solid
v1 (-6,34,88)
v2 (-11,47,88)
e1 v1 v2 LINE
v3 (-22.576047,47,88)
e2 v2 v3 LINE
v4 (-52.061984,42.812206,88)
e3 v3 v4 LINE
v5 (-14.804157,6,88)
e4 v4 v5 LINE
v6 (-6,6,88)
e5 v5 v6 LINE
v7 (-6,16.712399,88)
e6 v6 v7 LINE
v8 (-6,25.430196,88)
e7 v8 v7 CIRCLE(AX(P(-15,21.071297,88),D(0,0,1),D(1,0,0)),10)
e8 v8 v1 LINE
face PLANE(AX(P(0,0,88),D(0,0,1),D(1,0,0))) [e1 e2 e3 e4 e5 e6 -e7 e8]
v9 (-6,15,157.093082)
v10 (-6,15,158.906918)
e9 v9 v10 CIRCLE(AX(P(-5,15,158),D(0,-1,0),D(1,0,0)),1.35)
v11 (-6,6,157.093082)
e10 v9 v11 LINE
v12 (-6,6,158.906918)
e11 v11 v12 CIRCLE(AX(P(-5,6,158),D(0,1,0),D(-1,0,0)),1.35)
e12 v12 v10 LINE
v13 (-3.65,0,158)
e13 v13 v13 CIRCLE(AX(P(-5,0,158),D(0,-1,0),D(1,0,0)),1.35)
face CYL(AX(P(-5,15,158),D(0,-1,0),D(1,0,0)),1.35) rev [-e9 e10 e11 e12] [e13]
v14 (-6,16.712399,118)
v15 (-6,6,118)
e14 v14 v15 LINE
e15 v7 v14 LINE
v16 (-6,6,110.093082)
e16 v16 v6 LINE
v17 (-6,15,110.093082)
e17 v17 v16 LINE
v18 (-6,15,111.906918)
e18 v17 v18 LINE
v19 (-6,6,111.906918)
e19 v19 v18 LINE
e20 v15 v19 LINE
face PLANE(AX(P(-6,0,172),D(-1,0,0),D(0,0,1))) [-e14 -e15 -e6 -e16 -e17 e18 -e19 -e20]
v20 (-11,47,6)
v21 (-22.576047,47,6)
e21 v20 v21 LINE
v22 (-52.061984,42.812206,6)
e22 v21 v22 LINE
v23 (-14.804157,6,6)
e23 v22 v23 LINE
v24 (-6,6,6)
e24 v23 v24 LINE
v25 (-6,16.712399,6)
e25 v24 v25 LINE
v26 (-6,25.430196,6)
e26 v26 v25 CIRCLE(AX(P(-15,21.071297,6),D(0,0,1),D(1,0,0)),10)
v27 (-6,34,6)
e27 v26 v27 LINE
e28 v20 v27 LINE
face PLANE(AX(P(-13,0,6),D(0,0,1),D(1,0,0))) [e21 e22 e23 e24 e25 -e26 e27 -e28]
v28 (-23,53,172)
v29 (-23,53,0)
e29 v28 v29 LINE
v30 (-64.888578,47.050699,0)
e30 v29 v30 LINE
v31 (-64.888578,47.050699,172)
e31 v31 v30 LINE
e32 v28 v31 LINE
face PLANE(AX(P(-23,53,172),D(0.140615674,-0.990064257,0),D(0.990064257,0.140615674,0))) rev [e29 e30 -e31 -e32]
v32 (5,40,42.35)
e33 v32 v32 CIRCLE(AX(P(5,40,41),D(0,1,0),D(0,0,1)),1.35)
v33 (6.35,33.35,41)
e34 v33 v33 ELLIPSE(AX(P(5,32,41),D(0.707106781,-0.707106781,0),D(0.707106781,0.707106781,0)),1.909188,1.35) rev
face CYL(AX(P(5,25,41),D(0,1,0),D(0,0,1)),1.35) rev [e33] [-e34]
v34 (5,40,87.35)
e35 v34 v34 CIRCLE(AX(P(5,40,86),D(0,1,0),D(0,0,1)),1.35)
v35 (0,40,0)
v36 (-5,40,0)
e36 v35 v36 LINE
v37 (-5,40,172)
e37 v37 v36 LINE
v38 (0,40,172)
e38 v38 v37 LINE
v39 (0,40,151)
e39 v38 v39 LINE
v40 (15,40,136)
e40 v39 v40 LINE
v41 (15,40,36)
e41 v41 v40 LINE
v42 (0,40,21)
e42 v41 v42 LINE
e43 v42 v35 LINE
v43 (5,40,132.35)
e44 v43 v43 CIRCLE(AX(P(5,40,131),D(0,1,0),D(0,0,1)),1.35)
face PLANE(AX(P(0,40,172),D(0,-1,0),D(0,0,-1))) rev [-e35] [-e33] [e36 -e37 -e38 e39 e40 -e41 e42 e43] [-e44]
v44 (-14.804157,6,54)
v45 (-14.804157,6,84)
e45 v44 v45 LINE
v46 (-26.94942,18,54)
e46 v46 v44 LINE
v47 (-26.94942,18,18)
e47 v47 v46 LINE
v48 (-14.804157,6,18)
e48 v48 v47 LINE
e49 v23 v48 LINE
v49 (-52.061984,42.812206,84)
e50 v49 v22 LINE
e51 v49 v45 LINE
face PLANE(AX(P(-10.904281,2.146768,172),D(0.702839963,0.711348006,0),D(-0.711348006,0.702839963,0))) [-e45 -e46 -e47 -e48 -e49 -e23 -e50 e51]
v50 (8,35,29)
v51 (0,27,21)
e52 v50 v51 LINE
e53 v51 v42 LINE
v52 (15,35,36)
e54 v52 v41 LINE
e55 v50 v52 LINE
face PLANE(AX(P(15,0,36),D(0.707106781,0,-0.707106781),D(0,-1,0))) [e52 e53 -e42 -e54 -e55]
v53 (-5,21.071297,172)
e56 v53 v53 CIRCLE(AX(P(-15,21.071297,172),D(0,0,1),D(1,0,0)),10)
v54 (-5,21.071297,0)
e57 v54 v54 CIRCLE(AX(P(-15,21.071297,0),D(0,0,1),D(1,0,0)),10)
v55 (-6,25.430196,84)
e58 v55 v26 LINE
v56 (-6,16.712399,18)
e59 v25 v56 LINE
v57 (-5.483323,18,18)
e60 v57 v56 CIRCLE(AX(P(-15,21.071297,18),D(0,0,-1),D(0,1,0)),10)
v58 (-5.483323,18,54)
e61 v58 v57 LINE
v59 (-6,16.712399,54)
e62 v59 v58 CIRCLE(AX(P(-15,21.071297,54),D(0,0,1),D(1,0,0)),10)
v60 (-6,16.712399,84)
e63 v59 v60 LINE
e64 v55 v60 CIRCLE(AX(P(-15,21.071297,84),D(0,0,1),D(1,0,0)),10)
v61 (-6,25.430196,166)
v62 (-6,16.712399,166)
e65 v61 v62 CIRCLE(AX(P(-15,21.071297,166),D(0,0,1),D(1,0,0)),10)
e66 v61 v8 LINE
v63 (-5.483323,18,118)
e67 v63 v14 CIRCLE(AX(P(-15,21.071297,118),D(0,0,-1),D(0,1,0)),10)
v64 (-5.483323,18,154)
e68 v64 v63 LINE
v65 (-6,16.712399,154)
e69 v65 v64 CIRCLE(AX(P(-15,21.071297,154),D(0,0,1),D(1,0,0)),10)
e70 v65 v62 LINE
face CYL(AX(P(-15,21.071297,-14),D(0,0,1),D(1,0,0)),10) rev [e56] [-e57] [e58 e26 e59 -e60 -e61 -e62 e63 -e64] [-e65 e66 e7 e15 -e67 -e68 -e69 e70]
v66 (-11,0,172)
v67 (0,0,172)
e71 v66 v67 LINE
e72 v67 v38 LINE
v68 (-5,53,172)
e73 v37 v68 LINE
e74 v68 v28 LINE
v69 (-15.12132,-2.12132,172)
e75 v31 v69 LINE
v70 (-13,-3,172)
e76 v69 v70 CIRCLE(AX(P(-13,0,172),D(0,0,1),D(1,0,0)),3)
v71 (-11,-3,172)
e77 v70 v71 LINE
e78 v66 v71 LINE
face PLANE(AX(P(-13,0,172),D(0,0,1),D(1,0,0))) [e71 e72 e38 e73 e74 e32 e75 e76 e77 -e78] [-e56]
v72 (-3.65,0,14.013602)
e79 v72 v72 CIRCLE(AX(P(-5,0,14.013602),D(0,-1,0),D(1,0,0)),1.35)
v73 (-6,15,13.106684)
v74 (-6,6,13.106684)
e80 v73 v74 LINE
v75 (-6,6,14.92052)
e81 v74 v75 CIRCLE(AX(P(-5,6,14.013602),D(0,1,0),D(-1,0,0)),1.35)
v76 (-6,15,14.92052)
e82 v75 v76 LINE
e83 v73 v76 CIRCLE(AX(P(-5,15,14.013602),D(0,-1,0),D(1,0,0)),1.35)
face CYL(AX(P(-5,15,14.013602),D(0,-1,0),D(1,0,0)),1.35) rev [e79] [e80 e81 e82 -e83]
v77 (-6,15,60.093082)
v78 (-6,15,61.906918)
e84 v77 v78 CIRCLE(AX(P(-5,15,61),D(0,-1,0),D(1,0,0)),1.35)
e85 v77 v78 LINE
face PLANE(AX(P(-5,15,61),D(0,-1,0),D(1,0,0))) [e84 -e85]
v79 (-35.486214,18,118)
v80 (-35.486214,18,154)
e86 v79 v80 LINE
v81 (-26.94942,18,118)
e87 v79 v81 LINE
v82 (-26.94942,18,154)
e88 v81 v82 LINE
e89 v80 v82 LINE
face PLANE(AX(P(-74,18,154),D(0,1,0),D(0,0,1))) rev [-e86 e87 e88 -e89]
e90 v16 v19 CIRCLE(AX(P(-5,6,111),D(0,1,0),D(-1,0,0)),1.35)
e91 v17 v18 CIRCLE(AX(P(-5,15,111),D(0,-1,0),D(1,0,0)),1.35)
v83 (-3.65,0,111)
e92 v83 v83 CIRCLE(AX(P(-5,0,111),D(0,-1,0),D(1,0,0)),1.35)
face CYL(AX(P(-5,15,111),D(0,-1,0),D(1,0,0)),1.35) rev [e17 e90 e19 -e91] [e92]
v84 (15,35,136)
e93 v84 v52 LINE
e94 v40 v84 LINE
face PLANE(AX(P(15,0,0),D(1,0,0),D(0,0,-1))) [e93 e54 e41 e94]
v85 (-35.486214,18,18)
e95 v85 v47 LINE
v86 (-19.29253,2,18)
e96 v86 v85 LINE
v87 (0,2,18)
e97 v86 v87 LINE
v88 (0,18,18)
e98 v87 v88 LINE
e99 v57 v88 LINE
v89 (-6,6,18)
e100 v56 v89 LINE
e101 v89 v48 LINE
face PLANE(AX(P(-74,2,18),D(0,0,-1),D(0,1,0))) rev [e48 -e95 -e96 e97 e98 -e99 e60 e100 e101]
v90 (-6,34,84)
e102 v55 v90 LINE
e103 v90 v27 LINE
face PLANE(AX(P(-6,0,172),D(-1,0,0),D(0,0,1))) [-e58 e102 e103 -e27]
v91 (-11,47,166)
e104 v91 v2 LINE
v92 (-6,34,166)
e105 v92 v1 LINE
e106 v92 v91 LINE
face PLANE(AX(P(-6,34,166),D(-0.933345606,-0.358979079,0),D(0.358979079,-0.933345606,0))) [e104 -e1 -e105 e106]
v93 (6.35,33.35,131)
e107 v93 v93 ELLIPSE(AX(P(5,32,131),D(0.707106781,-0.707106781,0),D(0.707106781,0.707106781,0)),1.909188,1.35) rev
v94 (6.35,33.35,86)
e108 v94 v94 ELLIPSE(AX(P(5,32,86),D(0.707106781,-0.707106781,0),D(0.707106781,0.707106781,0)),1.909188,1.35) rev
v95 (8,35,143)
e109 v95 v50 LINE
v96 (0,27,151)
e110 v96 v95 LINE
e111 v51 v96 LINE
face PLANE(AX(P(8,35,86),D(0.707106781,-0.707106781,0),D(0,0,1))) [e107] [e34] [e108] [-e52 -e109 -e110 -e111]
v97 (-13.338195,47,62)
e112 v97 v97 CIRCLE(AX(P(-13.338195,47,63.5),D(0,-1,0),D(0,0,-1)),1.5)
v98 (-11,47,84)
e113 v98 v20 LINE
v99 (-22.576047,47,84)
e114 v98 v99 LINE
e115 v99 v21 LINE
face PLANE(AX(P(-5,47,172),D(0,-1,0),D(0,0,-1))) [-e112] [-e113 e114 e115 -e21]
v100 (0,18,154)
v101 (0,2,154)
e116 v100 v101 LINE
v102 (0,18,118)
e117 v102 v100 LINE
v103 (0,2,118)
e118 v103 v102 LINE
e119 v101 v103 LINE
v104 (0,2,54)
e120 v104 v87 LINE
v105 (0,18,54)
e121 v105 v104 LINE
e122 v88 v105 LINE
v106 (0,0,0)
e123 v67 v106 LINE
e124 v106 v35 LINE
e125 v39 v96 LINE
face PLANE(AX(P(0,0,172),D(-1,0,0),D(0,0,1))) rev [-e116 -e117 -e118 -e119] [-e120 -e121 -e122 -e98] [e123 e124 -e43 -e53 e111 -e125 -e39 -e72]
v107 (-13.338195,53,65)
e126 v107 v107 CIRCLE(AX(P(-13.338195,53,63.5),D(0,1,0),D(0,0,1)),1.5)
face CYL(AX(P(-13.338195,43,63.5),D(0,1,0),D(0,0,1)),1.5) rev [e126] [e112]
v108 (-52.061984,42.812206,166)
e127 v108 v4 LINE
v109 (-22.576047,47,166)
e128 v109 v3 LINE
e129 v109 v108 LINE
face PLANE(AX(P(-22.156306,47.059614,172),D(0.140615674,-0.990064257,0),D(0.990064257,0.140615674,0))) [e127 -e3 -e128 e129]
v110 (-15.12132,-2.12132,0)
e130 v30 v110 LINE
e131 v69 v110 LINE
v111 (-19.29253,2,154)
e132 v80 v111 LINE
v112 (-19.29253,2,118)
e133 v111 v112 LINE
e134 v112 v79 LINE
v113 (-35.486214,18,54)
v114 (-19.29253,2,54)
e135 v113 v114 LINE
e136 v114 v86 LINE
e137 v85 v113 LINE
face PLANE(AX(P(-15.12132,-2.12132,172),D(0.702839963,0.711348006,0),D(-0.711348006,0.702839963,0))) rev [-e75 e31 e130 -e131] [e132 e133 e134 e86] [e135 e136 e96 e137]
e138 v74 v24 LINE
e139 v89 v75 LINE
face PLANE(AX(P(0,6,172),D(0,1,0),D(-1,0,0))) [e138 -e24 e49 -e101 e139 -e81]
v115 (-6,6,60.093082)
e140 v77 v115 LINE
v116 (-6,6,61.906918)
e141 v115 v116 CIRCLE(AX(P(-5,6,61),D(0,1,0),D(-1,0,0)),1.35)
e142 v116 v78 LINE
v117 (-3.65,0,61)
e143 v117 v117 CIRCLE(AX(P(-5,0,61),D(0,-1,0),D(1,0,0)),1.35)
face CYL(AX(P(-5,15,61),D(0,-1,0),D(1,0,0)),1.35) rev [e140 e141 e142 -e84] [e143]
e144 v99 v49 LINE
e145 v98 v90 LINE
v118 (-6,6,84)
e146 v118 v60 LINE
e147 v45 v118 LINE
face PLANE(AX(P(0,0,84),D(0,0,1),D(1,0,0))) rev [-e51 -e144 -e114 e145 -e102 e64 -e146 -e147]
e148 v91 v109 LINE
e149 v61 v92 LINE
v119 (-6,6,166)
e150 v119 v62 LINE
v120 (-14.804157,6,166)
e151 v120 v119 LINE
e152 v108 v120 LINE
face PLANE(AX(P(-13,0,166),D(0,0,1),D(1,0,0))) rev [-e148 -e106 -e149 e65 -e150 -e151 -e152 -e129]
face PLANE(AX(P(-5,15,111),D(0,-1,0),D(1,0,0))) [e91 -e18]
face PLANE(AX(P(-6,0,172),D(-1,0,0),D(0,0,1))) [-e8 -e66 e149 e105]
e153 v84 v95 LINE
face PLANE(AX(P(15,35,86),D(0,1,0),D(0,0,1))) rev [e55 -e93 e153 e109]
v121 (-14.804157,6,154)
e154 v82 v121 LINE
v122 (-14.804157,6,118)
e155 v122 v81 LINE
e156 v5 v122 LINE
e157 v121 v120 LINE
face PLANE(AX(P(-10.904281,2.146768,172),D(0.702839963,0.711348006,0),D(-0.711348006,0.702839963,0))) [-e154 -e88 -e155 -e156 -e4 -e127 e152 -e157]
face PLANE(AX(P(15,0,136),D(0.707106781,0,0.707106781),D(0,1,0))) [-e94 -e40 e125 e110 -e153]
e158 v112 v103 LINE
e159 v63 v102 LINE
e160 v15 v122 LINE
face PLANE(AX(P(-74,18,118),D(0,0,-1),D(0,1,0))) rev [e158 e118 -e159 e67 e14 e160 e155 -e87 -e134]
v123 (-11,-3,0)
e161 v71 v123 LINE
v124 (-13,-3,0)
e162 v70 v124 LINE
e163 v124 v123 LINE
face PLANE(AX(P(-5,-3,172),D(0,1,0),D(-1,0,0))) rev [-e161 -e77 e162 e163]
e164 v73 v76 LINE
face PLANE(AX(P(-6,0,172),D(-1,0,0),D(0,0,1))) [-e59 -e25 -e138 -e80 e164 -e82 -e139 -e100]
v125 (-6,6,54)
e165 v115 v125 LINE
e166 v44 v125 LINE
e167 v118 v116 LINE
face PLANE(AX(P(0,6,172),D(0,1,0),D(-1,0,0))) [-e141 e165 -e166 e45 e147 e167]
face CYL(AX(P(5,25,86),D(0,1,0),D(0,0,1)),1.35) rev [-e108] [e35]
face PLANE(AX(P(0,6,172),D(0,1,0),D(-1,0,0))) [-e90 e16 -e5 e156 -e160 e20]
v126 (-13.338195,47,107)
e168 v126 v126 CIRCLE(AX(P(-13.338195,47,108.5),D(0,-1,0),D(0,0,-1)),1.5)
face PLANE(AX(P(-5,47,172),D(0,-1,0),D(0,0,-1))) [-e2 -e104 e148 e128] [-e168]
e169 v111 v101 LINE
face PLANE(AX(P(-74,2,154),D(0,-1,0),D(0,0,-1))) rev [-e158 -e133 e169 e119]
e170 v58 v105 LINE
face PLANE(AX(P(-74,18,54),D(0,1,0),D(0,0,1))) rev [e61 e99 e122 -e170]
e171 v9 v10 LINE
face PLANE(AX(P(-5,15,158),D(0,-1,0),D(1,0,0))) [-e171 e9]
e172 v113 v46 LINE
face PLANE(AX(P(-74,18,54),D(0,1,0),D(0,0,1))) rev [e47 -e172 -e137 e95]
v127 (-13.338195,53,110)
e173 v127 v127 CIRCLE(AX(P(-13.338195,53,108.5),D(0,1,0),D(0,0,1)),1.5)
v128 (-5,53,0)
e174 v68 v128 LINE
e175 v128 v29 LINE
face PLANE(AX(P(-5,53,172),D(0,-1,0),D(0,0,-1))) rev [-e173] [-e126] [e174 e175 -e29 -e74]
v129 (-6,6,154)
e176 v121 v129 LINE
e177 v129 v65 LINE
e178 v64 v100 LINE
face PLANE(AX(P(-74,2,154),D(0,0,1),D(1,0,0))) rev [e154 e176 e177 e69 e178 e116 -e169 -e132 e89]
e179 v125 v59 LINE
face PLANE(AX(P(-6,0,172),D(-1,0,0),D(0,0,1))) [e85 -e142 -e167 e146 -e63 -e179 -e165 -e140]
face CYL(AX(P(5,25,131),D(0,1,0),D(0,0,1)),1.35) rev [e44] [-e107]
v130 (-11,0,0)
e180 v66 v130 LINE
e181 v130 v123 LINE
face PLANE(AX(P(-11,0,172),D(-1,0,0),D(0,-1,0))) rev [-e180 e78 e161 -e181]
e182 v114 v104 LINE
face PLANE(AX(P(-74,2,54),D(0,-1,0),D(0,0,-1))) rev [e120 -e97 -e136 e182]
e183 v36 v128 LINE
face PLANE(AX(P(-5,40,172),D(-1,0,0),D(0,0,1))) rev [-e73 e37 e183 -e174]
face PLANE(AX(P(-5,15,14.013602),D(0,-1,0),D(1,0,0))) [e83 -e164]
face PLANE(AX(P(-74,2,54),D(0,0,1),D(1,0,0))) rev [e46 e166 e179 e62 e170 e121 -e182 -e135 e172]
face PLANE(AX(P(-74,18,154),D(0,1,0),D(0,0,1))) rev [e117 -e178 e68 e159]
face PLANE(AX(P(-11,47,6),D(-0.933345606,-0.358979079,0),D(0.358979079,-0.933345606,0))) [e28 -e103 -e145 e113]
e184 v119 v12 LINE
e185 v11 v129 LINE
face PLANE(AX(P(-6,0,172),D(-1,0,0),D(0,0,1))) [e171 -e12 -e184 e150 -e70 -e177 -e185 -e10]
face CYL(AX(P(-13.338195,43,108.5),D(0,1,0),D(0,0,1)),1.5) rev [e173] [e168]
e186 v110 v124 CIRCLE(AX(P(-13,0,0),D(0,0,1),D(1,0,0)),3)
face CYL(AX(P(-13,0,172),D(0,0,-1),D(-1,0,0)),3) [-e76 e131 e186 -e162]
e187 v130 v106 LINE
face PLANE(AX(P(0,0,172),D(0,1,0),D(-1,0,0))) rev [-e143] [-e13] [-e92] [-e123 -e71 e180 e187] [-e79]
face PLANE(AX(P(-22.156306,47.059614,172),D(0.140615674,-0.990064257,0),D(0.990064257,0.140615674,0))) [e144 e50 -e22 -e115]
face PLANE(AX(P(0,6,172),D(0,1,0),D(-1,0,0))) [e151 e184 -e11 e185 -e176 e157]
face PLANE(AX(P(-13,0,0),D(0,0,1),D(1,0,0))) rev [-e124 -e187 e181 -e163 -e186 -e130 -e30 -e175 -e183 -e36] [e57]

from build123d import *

# Parameters (mm, degrees)
EXTRUDE_1_DEPTH     = 172
SHELL_START         = 6
SHELL_1_DEPTH       = 160
SKETCH_2_W          = 36
SKETCH_2_H          = 16
CUT_EXTRUDE_1_DEPTH = 74
EXTRUDE_2_DEPTH     = 2
SKETCH_4_R          = 10
CUT_EXTRUDE_2_DEPTH = 186
SKETCH_5_R          = 1.5
CUT_EXTRUDE_3_DEPTH = 10
EXTRUDE_3_DEPTH     = 172
SKETCH_7_W          = 36
SKETCH_7_H          = 16
CUT_EXTRUDE_4_DEPTH = 172
SKETCH_8_W          = 6
SKETCH_8_H          = 172
CUT_EXTRUDE_5_DEPTH = 3
EXTRUDE_4_DEPTH     = 15
CHAMFER_1_SIZE      = 15
CHAMFER_2_SIZE      = 15
CHAMFER_3_SIZE      = 8
SKETCH_10_R         = 1.35
CUT_EXTRUDE_6_DEPTH = 15
SKETCH_12_R         = 1.35
CUT_EXTRUDE_7_DEPTH = 15
CUT_EXTRUDE_8_DEPTH = 78
CUT_EXTRUDE_9_DEPTH = 78


# Read off the part's stored shape, not the designer's step: 抽壳1
with BuildPart() as part:
    # 草图1 → 凸台-拉伸1 (new body)
    with BuildSketch(Plane.XY):
        with BuildLine():
            Line((0, 0), (0, 40))
            Line((0, 40), (-5, 40))
            Line((-5, 40), (-5, 53))
            Line((-5, 53), (-23, 53))
            Line((-23, 53), (-64.888578151, 47.050698608))
            Line((-64.888578151, 47.050698608), (-15.121320344, -2.121320344))
            ThreePointArc((-15.121320344, -2.121320344), (-14.148050297, -2.771638598), (-13, -3))
            Line((-13, -3), (-5, -3))
            Line((-5, -3), (-5, 0))
            Line((-5, 0), (0, 0))
        make_face()
    extrude(amount=EXTRUDE_1_DEPTH)

    # 抽壳1 outline → 抽壳1 (cut)
    with BuildSketch(Plane.XY.offset(SHELL_START)):
        Polygon((-11, 6), (-6, 6), (-6, 34), (-11, 34), (-11, 47), (-22.576046832, 47), (-52.061983815, 42.812206246), (-11.767841448, 3), (-11, 3), align=None)
    extrude(amount=SHELL_1_DEPTH, mode=Mode.SUBTRACT)

    # 草图2 → 切除-拉伸1 (cut)
    with BuildSketch(Plane(origin=(0, 0, 0), x_dir=(0, 0, -1), z_dir=(1, 0, 0))):
        with Locations((-136, 10)):
            Rectangle(SKETCH_2_W, SKETCH_2_H)
        with Locations((-36, 10)):
            Rectangle(SKETCH_2_W, SKETCH_2_H)
    extrude(amount=-CUT_EXTRUDE_1_DEPTH, mode=Mode.SUBTRACT)

    # 草图3 → 凸台-拉伸2 (add, symmetric)
    with BuildSketch(Plane(origin=(0, 0, 86), x_dir=(-1, 0, 0), z_dir=(0, 0, -1))):
        Polygon((5, 53), (5, 40), (0, 40), (0, 0), (5, 0), (5, -3), (13, -3), (16.579355858, -0.680723591), (64.888578151, 47.050698608), (23, 53), align=None)
    extrude(amount=EXTRUDE_2_DEPTH, both=True)

    # 草图4 → 切除-拉伸2 (cut)
    with BuildSketch(Plane.XY.offset(172)):
        with Locations((-15, 21.071297481)):
            Circle(SKETCH_4_R)
    extrude(amount=-CUT_EXTRUDE_2_DEPTH, mode=Mode.SUBTRACT)

    # 草图5 → 切除-拉伸3 (cut)
    with BuildSketch(Plane(origin=(0, 53, 0), x_dir=(1, 0, 0), z_dir=(0, 1, 0))):
        with Locations(Location((-13.338195438, -63.5, 0), (0, 0, 270))):
            Circle(SKETCH_5_R)
        with Locations(Location((-13.338195438, -108.5, 0), (0, 0, 270))):
            Circle(SKETCH_5_R)
    extrude(amount=-CUT_EXTRUDE_3_DEPTH, mode=Mode.SUBTRACT)

    # 草图6 → 凸台-拉伸3 (add)
    with BuildSketch(Plane.XY.offset(172)):
        Polygon((-11, 6), (-14.804157153, 6), (-11.767841448, 3), (-11, 3), align=None)
    extrude(amount=-EXTRUDE_3_DEPTH)

    # 草图7 → 切除-拉伸4 (cut)
    with BuildSketch(Plane(origin=(0, 0, 0), x_dir=(0, 0, -1), z_dir=(1, 0, 0))):
        with Locations((-136, 10)):
            Rectangle(SKETCH_7_W, SKETCH_7_H)
        with Locations((-36, 10)):
            Rectangle(SKETCH_7_W, SKETCH_7_H)
    extrude(amount=-CUT_EXTRUDE_4_DEPTH, mode=Mode.SUBTRACT)

    # 草图8 → 切除-拉伸5 (cut)
    with BuildSketch(Plane.XZ.offset(3)):
        with Locations((-8, 86)):
            Rectangle(SKETCH_8_W, SKETCH_8_H)
    extrude(amount=-CUT_EXTRUDE_5_DEPTH, mode=Mode.SUBTRACT)

    # 草图9 → 凸台-拉伸4 (add)
    with BuildSketch(Plane(origin=(0, 0, 0), x_dir=(0, 0, -1), z_dir=(1, 0, 0))):
        Polygon((-86, 40), (-151, 40), (-151, 35), (-86, 35), (-21, 35), (-21, 40), align=None)
    extrude(amount=EXTRUDE_4_DEPTH)

    # 倒角1
    chamfer_1_edges = [part.edges().sort_by_distance(p)[0] for p in [
        (15, 37.5, 151),
    ]]
    chamfer(chamfer_1_edges, length=CHAMFER_1_SIZE - 0.0001)  # a hair under: the kernel refuses the full size

    # 倒角2
    chamfer_2_edges = [part.edges().sort_by_distance(p)[0] for p in [
        (15, 37.5, 21),
    ]]
    chamfer(chamfer_2_edges, length=CHAMFER_2_SIZE - 0.0001)  # a hair under: the kernel refuses the full size

    # 倒角3
    chamfer_3_edges = [part.edges().sort_by_distance(p)[0] for p in [
        (0, 35, 86),
    ]]
    chamfer(chamfer_3_edges, length=CHAMFER_3_SIZE)

    # 草图10 → 切除-拉伸6 (cut)
    with BuildSketch(Plane.XZ):
        with Locations((-5, 158)):
            Circle(SKETCH_10_R)
        with Locations((-5, 111)):
            Circle(SKETCH_10_R)
        with Locations((-5, 61)):
            Circle(SKETCH_10_R)
        with Locations((-5, 14.01360213)):
            Circle(SKETCH_10_R)
    extrude(amount=-CUT_EXTRUDE_6_DEPTH, mode=Mode.SUBTRACT)

    # 草图12 → 切除-拉伸7 (cut)
    with BuildSketch(Plane(origin=(0, 40, 0), x_dir=(1, 0, 0), z_dir=(0, 1, 0))):
        with Locations(Location((5, -41, 0), (0, 0, 270))):
            Circle(SKETCH_12_R)
        with Locations(Location((5, -86, 0), (0, 0, 270))):
            Circle(SKETCH_12_R)
        with Locations(Location((5, -131, 0), (0, 0, 270))):
            Circle(SKETCH_12_R)
    extrude(amount=-CUT_EXTRUDE_7_DEPTH, mode=Mode.SUBTRACT)

    # 草图14 → 切除-拉伸8 (cut)
    with BuildSketch(Plane(origin=(0, 0, 84), x_dir=(-1, 0, 0), z_dir=(0, 0, -1))):
        Polygon((11, 47), (6, 34), (11, 34), align=None)
    extrude(amount=CUT_EXTRUDE_8_DEPTH, mode=Mode.SUBTRACT)

    # 草图16 → 切除-拉伸9 (cut)
    with BuildSketch(Plane.XY.offset(88)):
        Polygon((-11, 47), (-11, 34), (-6, 34), align=None)
    extrude(amount=CUT_EXTRUDE_9_DEPTH, mode=Mode.SUBTRACT)


solid = part.part
